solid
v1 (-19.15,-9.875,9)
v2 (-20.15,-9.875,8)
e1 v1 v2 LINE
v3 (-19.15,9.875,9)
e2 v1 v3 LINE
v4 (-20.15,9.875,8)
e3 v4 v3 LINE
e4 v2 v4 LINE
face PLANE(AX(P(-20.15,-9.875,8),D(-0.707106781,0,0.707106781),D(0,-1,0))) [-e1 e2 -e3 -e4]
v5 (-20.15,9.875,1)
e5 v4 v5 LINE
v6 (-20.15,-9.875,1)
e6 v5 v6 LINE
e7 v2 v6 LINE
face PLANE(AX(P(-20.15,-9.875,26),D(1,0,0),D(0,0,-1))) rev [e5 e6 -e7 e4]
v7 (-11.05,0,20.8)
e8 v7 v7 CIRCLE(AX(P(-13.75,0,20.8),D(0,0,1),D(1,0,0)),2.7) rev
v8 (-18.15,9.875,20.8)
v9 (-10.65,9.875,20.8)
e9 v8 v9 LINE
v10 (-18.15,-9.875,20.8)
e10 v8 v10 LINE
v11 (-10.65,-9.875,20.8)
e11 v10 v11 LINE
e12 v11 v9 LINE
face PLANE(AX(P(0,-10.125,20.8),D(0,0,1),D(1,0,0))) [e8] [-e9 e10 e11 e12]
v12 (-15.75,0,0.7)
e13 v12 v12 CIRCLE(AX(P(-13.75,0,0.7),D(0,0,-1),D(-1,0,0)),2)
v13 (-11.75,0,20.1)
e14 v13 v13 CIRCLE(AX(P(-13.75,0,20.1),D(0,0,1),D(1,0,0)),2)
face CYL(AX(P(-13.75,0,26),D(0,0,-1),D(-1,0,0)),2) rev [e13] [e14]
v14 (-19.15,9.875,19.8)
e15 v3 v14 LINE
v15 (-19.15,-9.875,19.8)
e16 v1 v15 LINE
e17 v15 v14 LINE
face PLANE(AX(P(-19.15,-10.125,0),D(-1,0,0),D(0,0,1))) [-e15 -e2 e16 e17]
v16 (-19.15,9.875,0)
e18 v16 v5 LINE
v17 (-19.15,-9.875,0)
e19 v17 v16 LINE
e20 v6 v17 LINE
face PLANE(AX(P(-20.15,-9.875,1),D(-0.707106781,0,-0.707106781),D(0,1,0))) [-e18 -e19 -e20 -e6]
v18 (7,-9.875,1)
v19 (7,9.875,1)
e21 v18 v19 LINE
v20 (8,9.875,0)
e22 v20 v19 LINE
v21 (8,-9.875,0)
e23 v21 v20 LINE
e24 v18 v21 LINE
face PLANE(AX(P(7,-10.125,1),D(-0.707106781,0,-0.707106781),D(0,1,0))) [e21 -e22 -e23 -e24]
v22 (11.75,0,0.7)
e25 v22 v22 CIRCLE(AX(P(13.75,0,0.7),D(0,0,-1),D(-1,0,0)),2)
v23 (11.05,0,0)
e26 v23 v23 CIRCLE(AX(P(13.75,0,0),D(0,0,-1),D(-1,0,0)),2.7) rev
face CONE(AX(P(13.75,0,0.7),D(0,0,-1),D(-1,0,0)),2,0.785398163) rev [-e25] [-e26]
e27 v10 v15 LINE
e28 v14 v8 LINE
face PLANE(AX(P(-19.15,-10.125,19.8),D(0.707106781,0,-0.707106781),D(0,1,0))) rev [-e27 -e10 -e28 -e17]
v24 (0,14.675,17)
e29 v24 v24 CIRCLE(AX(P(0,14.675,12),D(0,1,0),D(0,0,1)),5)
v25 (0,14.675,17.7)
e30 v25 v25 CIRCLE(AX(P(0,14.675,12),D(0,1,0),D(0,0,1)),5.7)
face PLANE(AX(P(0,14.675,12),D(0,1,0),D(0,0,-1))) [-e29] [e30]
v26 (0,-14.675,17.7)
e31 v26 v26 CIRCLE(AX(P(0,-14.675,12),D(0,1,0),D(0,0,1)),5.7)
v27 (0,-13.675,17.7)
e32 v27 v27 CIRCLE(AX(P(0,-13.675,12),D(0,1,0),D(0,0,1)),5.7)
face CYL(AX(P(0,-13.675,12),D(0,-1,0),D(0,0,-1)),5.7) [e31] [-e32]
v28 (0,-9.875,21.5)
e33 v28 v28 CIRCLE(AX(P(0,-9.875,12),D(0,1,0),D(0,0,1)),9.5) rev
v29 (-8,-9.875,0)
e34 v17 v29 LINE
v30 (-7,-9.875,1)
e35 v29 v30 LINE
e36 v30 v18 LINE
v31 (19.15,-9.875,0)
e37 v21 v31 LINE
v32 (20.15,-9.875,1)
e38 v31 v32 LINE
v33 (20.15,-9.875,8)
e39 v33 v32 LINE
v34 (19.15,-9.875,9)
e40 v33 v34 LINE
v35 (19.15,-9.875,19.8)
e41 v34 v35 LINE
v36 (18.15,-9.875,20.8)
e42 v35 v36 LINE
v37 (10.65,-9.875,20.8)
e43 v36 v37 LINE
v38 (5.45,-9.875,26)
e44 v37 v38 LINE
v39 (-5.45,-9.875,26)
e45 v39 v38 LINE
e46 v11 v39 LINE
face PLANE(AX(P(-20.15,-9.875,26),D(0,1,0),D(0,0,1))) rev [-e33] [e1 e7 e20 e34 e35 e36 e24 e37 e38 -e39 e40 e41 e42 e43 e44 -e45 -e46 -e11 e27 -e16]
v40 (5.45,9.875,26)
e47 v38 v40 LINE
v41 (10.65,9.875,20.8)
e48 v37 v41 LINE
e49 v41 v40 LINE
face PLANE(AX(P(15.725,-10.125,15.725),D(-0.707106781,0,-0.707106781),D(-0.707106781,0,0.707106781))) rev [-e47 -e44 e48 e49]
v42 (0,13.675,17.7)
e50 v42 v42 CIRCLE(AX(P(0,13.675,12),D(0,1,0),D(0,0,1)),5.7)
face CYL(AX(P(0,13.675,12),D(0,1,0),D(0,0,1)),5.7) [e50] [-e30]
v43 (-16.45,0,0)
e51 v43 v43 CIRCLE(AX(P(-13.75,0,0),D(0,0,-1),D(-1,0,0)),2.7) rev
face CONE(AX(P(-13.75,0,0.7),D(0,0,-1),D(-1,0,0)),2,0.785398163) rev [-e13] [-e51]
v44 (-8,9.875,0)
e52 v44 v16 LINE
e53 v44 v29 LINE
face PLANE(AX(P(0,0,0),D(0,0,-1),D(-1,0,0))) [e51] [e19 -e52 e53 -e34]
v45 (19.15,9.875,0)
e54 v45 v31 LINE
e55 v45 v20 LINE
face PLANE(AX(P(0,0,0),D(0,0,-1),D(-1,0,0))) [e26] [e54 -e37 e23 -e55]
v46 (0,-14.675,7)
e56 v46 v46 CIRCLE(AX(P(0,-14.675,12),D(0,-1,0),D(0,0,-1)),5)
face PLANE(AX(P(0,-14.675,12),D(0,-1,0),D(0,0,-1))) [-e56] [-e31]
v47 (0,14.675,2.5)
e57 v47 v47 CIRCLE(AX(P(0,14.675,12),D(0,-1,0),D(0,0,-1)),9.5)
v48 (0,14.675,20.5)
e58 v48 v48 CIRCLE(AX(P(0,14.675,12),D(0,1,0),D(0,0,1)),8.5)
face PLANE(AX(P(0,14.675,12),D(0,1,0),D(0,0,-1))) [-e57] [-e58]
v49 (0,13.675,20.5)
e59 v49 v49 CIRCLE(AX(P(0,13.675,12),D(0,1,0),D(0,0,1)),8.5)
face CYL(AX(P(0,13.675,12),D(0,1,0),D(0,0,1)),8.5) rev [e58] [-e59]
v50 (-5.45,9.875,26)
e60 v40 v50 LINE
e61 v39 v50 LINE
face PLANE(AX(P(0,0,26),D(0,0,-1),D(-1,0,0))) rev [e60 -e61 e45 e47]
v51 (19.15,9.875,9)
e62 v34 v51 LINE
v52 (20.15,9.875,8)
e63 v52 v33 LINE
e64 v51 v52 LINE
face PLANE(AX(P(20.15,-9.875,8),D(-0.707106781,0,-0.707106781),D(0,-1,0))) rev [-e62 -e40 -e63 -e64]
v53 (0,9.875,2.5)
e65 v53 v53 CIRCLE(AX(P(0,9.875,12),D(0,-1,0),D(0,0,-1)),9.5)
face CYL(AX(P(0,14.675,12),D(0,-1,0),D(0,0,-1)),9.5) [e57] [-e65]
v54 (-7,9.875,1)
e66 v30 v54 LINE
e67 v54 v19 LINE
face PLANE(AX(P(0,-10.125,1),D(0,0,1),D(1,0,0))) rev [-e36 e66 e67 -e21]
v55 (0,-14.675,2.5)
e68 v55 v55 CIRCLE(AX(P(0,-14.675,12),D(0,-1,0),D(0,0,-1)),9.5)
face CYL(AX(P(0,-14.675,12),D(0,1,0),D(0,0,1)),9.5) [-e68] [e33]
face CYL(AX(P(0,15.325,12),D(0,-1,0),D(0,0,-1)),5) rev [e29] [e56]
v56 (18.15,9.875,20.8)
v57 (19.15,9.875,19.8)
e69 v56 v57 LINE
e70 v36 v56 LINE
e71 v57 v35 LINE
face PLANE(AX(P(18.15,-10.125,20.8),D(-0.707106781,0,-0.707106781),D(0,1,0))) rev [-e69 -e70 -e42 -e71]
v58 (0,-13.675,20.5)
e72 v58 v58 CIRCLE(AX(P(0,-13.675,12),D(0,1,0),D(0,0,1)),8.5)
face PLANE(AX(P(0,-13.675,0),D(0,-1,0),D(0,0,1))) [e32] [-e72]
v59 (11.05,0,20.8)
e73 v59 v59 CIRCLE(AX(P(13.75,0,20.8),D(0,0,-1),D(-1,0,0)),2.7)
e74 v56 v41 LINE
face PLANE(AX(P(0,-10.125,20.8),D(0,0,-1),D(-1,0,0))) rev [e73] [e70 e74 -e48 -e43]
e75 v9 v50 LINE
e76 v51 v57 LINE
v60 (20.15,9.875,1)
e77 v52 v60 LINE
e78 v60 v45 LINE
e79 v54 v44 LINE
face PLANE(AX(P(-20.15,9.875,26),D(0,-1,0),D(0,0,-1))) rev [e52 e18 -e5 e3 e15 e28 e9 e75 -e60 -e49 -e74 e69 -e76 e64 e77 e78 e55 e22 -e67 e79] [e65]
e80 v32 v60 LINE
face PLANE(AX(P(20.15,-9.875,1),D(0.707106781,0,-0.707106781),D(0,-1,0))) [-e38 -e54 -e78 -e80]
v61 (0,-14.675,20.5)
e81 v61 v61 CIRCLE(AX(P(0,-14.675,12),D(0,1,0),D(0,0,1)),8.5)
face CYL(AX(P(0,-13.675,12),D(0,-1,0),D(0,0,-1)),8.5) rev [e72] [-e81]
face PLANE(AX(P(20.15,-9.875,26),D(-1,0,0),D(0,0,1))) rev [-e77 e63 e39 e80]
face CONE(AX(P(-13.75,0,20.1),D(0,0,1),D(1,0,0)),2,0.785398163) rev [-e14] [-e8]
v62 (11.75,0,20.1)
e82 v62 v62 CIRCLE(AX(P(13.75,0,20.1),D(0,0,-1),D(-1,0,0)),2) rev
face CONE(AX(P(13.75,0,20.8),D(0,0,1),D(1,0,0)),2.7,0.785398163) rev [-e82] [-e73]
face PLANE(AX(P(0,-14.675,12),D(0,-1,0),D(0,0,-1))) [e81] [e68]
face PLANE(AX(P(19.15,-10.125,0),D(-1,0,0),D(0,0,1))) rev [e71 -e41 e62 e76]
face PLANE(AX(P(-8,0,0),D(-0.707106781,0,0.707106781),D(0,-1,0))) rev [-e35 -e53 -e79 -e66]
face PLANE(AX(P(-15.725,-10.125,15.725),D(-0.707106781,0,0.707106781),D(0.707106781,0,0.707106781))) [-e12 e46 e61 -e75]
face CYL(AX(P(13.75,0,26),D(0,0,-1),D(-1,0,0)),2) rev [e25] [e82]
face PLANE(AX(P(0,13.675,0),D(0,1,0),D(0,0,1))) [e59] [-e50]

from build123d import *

# Parameters (mm, degrees)
CROQUIS1_W              = 40.3
CROQUIS1_H              = 19.75
SALIENTE_EXTRUIR1_DEPTH = 26
CROQUIS2_W              = 14
CROQUIS2_H              = 1
CORTAR_EXTRUIR1_DEPTH   = 20
CROQUIS3_R              = 2
CORTAR_EXTRUIR2_DEPTH   = 26
CROQUIS4_R              = 9.5
SALIENTE_EXTRUIR2_DEPTH = 4.8
CROQUIS5_R              = 5
CORTAR_EXTRUIR3_DEPTH   = 30
CROQUIS6_R              = 8.5
CROQUIS6_R_2            = 5.7
CORTAR_EXTRUIR4_DEPTH   = 1
CHAFL_N1_SIZE           = 1
CHAFL_N2_SIZE           = 0.7


with BuildPart() as part:
    # Croquis1 → Saliente-Extruir1 (new body)
    with BuildSketch(Plane.XY):
        Rectangle(CROQUIS1_W, CROQUIS1_H)
    extrude(amount=SALIENTE_EXTRUIR1_DEPTH)

    # Croquis2 → Cortar-Extruir1 (cut)
    with BuildSketch(Plane(origin=(0, 9.875, 0), x_dir=(1, 0, 0), z_dir=(0, 1, 0))):
        Polygon((-19.15, -9), (-20.15, -9), (-20.15, -26), (-5.45, -26), (-10.65, -20.8), (-19.15, -20.8), align=None)
        Polygon((20.15, -26), (20.15, -9), (19.15, -9), (19.15, -20.8), (10.65, -20.8), (5.45, -26), align=None)
        with Locations((0, -0.5)):
            Rectangle(CROQUIS2_W, CROQUIS2_H)
    extrude(amount=-CORTAR_EXTRUIR1_DEPTH, mode=Mode.SUBTRACT)

    # Croquis3 → Cortar-Extruir2 (cut)
    with BuildSketch(Plane(origin=(0, 0, 0), x_dir=(-1, 0, 0), z_dir=(0, 0, -1))):
        with Locations((-13.75, 0)):
            Circle(CROQUIS3_R)
        with Locations((13.75, 0)):
            Circle(CROQUIS3_R)
    extrude(amount=-CORTAR_EXTRUIR2_DEPTH, mode=Mode.SUBTRACT)

    # Croquis4 → Saliente-Extruir2 (add)
    with BuildSketch(Plane.XZ.offset(9.875)):
        with Locations(Location((0, 12, 0), (0, 0, 90))):
            Circle(CROQUIS4_R)
    saliente_extruir2 = extrude(amount=SALIENTE_EXTRUIR2_DEPTH)

    # Simetría1: Saliente-Extruir2 across plane
    add(saliente_extruir2.mirror(Plane.ZX))

    # Croquis5 → Cortar-Extruir3 (cut)
    with BuildSketch(Plane.XZ.offset(14.675)):
        with Locations(Location((0, 12, 0), (0, 0, 270))):
            Circle(CROQUIS5_R)
    extrude(amount=-CORTAR_EXTRUIR3_DEPTH, mode=Mode.SUBTRACT)

    # Croquis6 → Cortar-Extruir4 (cut)
    with BuildSketch(Plane(origin=(0, 14.675, 0), x_dir=(1, 0, 0), z_dir=(0, 1, 0))):
        with Locations(Location((0, -12, 0), (0, 0, 270))):
            Circle(CROQUIS6_R)
        with Locations(Location((0, -12, 0), (0, 0, 270))):
            Circle(CROQUIS6_R_2, mode=Mode.SUBTRACT)
    cortar_extruir4 = extrude(amount=-CORTAR_EXTRUIR4_DEPTH, mode=Mode.SUBTRACT)

    # Simetría2: Cortar-Extruir4 across plane
    add(cortar_extruir4.mirror(Plane.ZX), mode=Mode.SUBTRACT)

    # Chaflán1
    chafl_n1_edges = [part.edges().sort_by_distance(p)[0] for p in [
        (-19.15, 0, 20.8),
        (-20.15, 0, 9),
        (19.15, 0, 20.8),
        (20.15, 0, 9),
        (-20.15, 0, 0),
        (20.15, 0, 0),
        (7, 0, 0),
        (-7, 0, 0),
    ]]
    chamfer(chafl_n1_edges, length=CHAFL_N1_SIZE - 0.0001)  # a hair under: the kernel refuses the full size

    # Chaflán2
    chafl_n2_edges = [part.edges().sort_by_distance(p)[0] for p in [
        (15.75, 0, 20.8),
        (15.75, 0, 0),
        (-11.75, 0, 20.8),
        (-11.75, 0, 0),
    ]]
    chamfer(chafl_n2_edges, length=CHAFL_N2_SIZE)


solid = part.part
